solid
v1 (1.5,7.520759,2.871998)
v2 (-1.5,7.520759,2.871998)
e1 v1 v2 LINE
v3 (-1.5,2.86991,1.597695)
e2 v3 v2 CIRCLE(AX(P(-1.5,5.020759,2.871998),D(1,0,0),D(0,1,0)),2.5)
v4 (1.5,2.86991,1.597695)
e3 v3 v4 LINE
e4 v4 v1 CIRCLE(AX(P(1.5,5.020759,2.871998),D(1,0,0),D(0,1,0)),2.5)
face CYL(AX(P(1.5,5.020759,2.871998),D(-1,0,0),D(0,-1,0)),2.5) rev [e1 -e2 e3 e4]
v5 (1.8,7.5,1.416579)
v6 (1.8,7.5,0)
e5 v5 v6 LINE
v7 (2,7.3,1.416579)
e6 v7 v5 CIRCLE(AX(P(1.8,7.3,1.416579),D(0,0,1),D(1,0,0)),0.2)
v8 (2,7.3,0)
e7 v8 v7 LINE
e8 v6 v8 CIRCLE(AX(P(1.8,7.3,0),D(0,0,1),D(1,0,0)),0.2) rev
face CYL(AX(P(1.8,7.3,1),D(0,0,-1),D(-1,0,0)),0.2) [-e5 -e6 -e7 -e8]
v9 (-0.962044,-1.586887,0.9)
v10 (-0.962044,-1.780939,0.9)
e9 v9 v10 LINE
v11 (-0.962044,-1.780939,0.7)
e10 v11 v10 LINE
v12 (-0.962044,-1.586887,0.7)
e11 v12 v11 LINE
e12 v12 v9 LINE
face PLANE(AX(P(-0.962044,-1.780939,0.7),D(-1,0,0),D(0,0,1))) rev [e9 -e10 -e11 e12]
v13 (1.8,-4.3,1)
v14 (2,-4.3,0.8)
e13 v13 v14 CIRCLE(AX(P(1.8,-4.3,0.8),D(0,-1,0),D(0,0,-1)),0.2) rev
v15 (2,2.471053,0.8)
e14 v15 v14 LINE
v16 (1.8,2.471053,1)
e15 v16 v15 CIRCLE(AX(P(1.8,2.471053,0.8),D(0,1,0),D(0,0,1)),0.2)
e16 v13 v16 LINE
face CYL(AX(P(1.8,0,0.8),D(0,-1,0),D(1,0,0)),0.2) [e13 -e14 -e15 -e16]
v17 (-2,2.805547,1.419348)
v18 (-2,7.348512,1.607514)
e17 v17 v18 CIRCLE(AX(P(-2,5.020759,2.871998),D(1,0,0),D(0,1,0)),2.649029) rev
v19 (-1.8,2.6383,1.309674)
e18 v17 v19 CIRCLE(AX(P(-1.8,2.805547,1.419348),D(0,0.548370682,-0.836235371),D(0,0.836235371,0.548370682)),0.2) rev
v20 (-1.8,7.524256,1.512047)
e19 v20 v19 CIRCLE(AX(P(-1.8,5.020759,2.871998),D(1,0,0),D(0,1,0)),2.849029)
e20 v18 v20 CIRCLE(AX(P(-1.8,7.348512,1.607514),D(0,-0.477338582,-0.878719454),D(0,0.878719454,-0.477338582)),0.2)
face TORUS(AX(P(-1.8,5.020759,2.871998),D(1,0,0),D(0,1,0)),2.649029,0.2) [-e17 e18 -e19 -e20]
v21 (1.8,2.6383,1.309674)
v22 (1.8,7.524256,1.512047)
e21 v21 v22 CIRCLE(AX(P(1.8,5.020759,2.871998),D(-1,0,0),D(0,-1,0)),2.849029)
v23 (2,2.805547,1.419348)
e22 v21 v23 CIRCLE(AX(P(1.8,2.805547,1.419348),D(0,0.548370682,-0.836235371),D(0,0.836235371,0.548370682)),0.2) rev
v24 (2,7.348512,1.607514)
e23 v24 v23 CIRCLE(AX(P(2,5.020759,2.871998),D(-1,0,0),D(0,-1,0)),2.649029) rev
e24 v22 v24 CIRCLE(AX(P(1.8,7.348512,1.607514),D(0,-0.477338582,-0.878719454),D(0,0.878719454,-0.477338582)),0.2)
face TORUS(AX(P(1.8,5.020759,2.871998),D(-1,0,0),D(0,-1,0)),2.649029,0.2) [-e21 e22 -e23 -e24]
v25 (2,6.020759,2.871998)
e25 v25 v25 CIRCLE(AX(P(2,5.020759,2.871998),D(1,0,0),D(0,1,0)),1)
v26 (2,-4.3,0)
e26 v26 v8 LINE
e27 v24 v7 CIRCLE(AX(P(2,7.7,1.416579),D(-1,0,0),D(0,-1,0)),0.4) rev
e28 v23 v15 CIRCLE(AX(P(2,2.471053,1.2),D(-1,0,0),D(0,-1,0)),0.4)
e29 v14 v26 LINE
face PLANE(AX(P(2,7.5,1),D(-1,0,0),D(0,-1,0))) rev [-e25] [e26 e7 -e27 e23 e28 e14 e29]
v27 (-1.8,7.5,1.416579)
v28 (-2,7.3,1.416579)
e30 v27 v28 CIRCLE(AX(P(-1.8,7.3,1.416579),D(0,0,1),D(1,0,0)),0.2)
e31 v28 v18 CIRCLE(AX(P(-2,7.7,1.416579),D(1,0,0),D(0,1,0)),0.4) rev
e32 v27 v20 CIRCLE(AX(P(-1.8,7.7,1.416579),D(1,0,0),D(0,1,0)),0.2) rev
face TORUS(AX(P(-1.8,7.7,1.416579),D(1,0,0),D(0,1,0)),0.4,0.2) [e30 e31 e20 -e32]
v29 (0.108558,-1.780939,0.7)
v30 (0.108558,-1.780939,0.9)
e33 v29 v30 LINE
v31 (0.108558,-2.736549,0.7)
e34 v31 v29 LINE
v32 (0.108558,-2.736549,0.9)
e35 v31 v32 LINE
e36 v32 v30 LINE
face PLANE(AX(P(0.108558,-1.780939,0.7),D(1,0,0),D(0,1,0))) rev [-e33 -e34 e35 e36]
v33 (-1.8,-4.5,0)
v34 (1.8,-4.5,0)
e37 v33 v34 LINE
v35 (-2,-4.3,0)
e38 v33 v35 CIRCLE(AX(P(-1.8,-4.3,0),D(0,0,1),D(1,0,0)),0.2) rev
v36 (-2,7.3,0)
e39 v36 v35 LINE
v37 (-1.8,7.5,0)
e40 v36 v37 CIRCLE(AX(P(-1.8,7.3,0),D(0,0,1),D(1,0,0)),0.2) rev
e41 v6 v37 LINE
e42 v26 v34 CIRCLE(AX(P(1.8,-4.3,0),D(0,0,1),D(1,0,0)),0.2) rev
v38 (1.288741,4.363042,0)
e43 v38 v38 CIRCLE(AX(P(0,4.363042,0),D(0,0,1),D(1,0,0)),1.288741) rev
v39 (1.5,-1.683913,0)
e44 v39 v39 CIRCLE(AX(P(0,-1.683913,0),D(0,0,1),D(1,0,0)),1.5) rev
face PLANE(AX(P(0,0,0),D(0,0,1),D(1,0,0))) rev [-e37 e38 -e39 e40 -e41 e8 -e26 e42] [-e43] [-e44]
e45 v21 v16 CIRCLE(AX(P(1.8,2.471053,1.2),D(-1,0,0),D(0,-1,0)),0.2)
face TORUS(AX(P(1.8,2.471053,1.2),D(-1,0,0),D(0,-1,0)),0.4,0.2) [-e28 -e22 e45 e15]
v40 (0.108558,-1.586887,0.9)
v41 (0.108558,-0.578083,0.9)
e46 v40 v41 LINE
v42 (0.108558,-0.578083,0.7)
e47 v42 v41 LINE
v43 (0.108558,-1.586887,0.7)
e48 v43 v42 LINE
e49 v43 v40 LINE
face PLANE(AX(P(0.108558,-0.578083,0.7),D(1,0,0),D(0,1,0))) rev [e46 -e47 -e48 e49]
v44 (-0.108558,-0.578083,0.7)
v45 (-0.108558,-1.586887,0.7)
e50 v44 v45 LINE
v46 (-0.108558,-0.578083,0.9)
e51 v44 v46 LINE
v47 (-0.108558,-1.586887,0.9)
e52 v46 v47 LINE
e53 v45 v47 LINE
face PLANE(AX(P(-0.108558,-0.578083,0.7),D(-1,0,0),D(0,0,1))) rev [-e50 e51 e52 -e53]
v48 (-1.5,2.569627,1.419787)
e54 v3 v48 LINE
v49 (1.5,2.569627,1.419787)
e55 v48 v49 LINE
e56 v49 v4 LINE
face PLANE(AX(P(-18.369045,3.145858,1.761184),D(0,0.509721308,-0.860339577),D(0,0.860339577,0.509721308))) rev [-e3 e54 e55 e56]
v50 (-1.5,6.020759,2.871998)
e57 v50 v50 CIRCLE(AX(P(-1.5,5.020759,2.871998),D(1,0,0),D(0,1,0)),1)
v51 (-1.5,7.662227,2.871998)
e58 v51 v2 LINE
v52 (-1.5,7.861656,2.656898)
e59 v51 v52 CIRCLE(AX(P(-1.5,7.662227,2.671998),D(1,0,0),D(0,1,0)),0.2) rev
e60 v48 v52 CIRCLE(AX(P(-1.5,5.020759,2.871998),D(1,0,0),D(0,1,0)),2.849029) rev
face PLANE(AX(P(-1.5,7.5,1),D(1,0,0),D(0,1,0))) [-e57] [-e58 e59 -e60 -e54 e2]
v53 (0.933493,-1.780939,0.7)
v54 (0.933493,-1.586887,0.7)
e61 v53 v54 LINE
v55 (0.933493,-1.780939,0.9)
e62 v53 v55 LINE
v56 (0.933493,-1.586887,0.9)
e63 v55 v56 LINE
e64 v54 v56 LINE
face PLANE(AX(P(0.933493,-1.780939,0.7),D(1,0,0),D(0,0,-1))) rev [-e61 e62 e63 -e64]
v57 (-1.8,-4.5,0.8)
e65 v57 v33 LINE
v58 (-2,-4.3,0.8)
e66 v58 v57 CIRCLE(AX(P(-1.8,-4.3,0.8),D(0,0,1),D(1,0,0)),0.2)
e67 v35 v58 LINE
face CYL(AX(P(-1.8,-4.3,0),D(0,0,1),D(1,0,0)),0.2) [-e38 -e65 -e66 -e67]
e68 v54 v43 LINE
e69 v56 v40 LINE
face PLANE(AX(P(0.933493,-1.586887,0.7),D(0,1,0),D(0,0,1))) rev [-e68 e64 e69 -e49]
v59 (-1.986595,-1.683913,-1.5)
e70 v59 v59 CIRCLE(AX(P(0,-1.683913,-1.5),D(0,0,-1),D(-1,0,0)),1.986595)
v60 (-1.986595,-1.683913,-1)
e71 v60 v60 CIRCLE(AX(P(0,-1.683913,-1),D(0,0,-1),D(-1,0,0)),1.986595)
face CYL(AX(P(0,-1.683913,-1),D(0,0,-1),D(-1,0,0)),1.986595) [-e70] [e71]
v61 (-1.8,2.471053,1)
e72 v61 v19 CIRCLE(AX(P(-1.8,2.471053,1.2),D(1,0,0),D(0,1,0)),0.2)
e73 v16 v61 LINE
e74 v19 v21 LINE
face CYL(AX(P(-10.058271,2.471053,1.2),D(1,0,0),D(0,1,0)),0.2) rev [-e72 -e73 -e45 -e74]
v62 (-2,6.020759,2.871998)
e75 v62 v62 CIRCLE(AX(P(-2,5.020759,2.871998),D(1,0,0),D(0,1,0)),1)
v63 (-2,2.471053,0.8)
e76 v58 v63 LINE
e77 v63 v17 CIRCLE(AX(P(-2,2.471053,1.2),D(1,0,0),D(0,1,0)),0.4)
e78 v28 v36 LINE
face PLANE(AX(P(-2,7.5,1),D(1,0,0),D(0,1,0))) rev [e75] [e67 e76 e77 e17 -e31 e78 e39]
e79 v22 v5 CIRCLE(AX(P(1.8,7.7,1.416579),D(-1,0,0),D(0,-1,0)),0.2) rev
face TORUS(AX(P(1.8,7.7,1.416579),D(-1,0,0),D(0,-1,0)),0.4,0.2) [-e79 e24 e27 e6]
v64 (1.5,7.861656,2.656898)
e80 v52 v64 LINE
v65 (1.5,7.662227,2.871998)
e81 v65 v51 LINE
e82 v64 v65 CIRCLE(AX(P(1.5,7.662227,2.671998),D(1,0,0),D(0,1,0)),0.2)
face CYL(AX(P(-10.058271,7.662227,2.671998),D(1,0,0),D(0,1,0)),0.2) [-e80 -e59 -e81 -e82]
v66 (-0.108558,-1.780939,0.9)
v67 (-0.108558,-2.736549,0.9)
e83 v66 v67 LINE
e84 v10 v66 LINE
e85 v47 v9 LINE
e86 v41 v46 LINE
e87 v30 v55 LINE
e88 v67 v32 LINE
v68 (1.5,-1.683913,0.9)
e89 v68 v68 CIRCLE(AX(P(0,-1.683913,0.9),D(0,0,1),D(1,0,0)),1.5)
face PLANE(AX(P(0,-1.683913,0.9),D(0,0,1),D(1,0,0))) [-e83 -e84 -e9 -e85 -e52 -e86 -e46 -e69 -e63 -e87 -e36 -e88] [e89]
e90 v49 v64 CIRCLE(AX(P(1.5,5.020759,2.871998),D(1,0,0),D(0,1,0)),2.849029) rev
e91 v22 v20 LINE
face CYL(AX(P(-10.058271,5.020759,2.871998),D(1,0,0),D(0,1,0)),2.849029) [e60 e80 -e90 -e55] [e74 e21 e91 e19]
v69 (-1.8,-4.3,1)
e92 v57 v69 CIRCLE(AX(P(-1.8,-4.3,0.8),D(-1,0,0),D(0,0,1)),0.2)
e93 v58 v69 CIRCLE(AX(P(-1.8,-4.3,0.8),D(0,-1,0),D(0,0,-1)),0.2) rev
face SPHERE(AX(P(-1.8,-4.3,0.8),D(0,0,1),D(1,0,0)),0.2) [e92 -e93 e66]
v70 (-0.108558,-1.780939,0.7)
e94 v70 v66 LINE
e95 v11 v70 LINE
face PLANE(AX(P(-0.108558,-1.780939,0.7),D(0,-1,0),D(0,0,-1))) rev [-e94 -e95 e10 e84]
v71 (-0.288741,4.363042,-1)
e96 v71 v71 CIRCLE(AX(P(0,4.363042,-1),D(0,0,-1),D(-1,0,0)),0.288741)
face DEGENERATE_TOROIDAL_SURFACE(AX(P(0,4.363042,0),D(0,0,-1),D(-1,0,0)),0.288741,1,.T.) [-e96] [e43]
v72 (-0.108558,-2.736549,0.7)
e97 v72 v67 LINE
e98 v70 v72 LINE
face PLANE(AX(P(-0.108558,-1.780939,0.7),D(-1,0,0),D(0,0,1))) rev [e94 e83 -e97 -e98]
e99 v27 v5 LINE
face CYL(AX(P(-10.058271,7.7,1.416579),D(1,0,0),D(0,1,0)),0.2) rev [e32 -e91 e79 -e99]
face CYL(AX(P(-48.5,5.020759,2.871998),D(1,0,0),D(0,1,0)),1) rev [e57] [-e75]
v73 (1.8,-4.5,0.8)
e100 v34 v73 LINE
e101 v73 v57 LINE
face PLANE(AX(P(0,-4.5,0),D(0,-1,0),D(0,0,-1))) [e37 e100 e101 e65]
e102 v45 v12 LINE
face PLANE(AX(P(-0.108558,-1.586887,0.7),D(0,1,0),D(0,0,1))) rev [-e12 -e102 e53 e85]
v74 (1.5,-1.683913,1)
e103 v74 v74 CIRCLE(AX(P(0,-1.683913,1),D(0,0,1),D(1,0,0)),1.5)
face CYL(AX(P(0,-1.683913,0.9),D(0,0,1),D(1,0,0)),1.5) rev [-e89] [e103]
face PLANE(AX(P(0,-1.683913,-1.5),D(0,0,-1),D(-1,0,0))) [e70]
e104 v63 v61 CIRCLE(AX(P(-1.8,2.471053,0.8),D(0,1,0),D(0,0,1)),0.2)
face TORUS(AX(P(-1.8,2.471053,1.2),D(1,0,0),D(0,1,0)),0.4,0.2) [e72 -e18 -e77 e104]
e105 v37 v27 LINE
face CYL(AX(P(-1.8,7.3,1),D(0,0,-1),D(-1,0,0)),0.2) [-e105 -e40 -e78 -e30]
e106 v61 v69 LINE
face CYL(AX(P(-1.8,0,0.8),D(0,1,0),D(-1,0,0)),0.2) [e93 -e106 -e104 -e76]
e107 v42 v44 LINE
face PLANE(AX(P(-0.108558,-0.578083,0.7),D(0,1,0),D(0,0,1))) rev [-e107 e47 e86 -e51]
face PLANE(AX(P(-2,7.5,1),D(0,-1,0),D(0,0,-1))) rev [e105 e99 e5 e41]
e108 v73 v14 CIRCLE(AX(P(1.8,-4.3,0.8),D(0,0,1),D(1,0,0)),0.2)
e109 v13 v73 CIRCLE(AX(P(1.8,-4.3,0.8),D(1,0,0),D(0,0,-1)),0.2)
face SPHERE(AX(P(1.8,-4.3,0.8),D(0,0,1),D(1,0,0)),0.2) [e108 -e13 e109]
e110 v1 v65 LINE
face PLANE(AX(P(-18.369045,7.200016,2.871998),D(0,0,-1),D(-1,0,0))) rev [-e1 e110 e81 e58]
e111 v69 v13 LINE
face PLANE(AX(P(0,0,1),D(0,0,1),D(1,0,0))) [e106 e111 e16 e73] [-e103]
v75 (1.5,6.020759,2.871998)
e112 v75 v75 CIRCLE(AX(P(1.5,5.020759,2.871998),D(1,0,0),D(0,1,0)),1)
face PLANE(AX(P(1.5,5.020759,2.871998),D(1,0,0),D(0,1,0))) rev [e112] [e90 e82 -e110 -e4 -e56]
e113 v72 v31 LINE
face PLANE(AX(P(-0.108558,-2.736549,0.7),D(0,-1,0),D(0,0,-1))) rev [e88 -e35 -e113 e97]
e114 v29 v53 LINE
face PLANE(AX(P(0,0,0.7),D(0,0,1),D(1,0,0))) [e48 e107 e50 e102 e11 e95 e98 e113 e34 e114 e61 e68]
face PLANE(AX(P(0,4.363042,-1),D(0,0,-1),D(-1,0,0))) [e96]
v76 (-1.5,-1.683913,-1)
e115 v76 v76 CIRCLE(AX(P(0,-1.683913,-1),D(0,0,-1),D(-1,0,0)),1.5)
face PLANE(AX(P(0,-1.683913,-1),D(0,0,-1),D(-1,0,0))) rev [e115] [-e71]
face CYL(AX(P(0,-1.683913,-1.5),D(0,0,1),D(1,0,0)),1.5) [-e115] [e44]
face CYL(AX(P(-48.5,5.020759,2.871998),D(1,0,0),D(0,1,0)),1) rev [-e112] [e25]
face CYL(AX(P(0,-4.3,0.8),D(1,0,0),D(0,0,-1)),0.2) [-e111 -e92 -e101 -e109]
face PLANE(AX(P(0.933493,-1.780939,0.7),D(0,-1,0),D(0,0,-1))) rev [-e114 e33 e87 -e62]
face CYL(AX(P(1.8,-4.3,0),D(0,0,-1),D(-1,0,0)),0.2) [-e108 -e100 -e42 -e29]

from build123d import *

# Parameters (mm, degrees)
SKETCH1_W           = 4
SKETCH1_H           = 15
BOSS_EXTRUDE1_DEPTH = 1
SKETCH2_R           = 1.5
CUT_EXTRUDE1_DEPTH  = 0.1
CUT_EXTRUDE2_DEPTH  = 0.2
SKETCH4_R           = 2.849028986
BOSS_EXTRUDE2_DEPTH = 4
CUT_EXTRUDE3_START  = -0.5
CUT_EXTRUDE3_DEPTH  = 3
SKETCH6_R           = 1
CUT_EXTRUDE4_DEPTH  = 50.5
BOSS_EXTRUDE3_REACH = 11.393
SKETCH7_W           = 4
SKETCH7_H           = 0.331547144
SKETCH8_R           = 1.5
BOSS_EXTRUDE4_DEPTH = 1.5
SKETCH13_R          = 2.5
CUT_EXTRUDE6_DEPTH  = 3
SKETCH14_R          = 1.5
BOSS_EXTRUDE5_DEPTH = 1
SKETCH15_R          = 1.65511662
CUT_EXTRUDE7_DEPTH  = 1.5
SKETCH16_W          = 5.099694499
SKETCH16_H          = 2.218752709
CUT_EXTRUDE8_DEPTH  = 3
FILLET1_R           = 0.2
SKETCH17_R          = 1.288740584
BOSS_EXTRUDE6_DEPTH = 1
FILLET2_R           = 1
SKETCH18_R          = 1.986595171
BOSS_EXTRUDE7_DEPTH = 0.5


with BuildPart() as part:
    # Sketch1 → Boss-Extrude1 (new body)
    with BuildSketch(Plane.XY):
        Rectangle(SKETCH1_W, SKETCH1_H)
    extrude(amount=BOSS_EXTRUDE1_DEPTH)

    # Sketch2 → Cut-Extrude1 (cut)
    with BuildSketch(Plane.XY.offset(1)):
        with Locations((0, -5.001272615)):
            Circle(SKETCH2_R)
        with Locations((0, -1.683913286)):
            Circle(SKETCH2_R)
    extrude(amount=-CUT_EXTRUDE1_DEPTH, mode=Mode.SUBTRACT)

    # Sketch3 → Cut-Extrude2 (cut)
    with BuildSketch(Plane.XY.offset(0.9)):
        Polygon((-0.108557852, -6.107102786), (0.108557852, -6.107102786), (0.108557852, -5.098298557), (0.933492592, -5.098298557), (0.933492592, -4.904246673), (0.108557852, -4.904246673), (0.108557852, -3.948637219), (-0.108557852, -3.948637219), (-0.108557852, -4.904246673), (-0.962043741, -4.904246673), (-0.962043741, -5.098298557), (-0.108557852, -5.098298557), align=None)
        Polygon((-0.962043741, -1.780939228), (-0.962043741, -1.586887344), (-0.108557852, -1.586887344), (-0.108557852, -0.578083116), (0.108557852, -0.578083116), (0.108557852, -1.586887344), (0.933492592, -1.586887344), (0.933492592, -1.780939228), (0.108557852, -1.780939228), (0.108557852, -2.736548682), (-0.108557852, -2.736548682), (-0.108557852, -1.780939228), align=None)
    extrude(amount=-CUT_EXTRUDE2_DEPTH, mode=Mode.SUBTRACT)

    # Sketch4 → Boss-Extrude2 (add)
    with BuildSketch(Plane(origin=(2, 0, 0), x_dir=(0, 0, -1), z_dir=(1, 0, 0))):
        with Locations((-2.871998104, 5.020758916)):
            Circle(SKETCH4_R)
    extrude(amount=-BOSS_EXTRUDE2_DEPTH)

    # Sketch5 → Cut-Extrude3 (cut)
    with BuildSketch(Plane(origin=(2, 0, 0), x_dir=(0, 0, -1), z_dir=(1, 0, 0)).offset(CUT_EXTRUDE3_START)):
        with BuildLine():
            Line((-2.871998104, 7.200015745), (-2.871998104, 9.297132531))
            Line((-2.871998104, 9.297132531), (-14.767112772, 7.450442617))
            Line((-14.767112772, 7.450442617), (-10.359701014, 0.939041163))
            Line((-10.359701014, 0.939041163), (-1.261981382, 2.30327176))
            Line((-1.261981382, 2.30327176), (-1.761184463, 3.145858016))
            ThreePointArc((-1.761184463, 3.145858016), (-0.770207092, 5.596636393), (-2.871998104, 7.200015745))
        make_face()
    extrude(amount=-CUT_EXTRUDE3_DEPTH, mode=Mode.SUBTRACT)

    # Sketch6 → Cut-Extrude4 (cut)
    with BuildSketch(Plane(origin=(2, 0, 0), x_dir=(0, 0, -1), z_dir=(1, 0, 0))):
        with Locations(Location((-2.871998104, 5.020758916, 0), (0, 0, 90))):
            Circle(SKETCH6_R)
    extrude(amount=-CUT_EXTRUDE4_DEPTH, mode=Mode.SUBTRACT)

    # Sketch7 → Boss-Extrude3 (add, up to next)
    with BuildSketch(Plane.XY.offset(1), mode=Mode.PRIVATE) as boss_extrude3_sk1:
        with Locations((0, 7.334226428)):
            Rectangle(SKETCH7_W, SKETCH7_H)
    boss_extrude3_tool1 = extrude(boss_extrude3_sk1.sketch, amount=BOSS_EXTRUDE3_REACH, mode=Mode.PRIVATE) - part.part
    add(boss_extrude3_tool1.solids().sort_by_distance((0, 7.334226, 1))[0])

    # Sketch8 → Boss-Extrude4 (add)
    with BuildSketch(Plane(origin=(0, 0, 0), x_dir=(-1, 0, 0), z_dir=(0, 0, -1))):
        with Locations(Location((0, -1.683913286, 0), (0, 0, 180))):
            Circle(SKETCH8_R)
        with Locations(Location((0, -5.001272615, 0), (0, 0, 180))):
            Circle(SKETCH8_R)
    extrude(amount=BOSS_EXTRUDE4_DEPTH)

    # Sketch13 → Cut-Extrude6 (cut)
    with BuildSketch(Plane(origin=(-1.5, 0, 0), x_dir=(0, 0, -1), z_dir=(1, 0, 0))):
        with Locations((-2.871998104, 5.020758916)):
            Circle(SKETCH13_R)
    extrude(amount=CUT_EXTRUDE6_DEPTH, mode=Mode.SUBTRACT)

    # Sketch14 → Boss-Extrude5 (add)
    with BuildSketch(Plane.XY.offset(1)):
        with Locations((0, -5.001272615)):
            Circle(SKETCH14_R)
    extrude(amount=-BOSS_EXTRUDE5_DEPTH)

    # Sketch15 → Cut-Extrude7 (cut)
    with BuildSketch(Plane(origin=(0, 0, -1.5), x_dir=(-1, 0, 0), z_dir=(0, 0, -1))):
        with Locations((0, -5.001272615)):
            Circle(SKETCH15_R)
    extrude(amount=-CUT_EXTRUDE7_DEPTH, mode=Mode.SUBTRACT)

    # Sketch16 → Cut-Extrude8 (cut)
    with BuildSketch(Plane.XZ.offset(7.5)):
        with Locations((0.205566766, 0.392687456)):
            Rectangle(SKETCH16_W, SKETCH16_H)
    extrude(amount=-CUT_EXTRUDE8_DEPTH, mode=Mode.SUBTRACT)

    # Fillet1
    fillet1_edges = [part.edges().sort_by_distance(p)[0] for p in [
        (0, 7.869787902, 2.871998104),
        (2, 4.733861171, 5.706544954),
        (0, 7.5, 1.468313735),
        (2, -0.813467512, 1),
        (-2, -4.5, 0.5),
        (2, -4.5, 0.5),
        (0, -4.5, 1),
        (-2, 7.5, 0.734156868),
        (2, 7.5, 0.734156868),
        (-2, -0.813467512, 1),
        (0, 2.873064976, 1),
        (-2, 4.733861171, 5.706544954),
    ]]
    fillet(fillet1_edges, radius=FILLET1_R)

    # Sketch17 → Boss-Extrude6 (add)
    with BuildSketch(Plane(origin=(0, 0, 0), x_dir=(-1, 0, 0), z_dir=(0, 0, -1))):
        with Locations(Location((0, 4.363041625, 0), (0, 0, 180))):
            Circle(SKETCH17_R)
    extrude(amount=BOSS_EXTRUDE6_DEPTH)

    # Fillet2
    fillet2_edges = [part.edges().sort_by_distance(p)[0] for p in [
        (-1.288740584, 4.363041625, -1),
    ]]
    fillet(fillet2_edges, radius=FILLET2_R - 0.0001)  # a hair under: the kernel refuses the full size

    # Sketch18 → Boss-Extrude7 (add)
    with BuildSketch(Plane(origin=(0, 0, -1.5), x_dir=(-1, 0, 0), z_dir=(0, 0, -1))):
        with Locations((0, -1.683913286)):
            Circle(SKETCH18_R)
    extrude(amount=-BOSS_EXTRUDE7_DEPTH)


solid = part.part
